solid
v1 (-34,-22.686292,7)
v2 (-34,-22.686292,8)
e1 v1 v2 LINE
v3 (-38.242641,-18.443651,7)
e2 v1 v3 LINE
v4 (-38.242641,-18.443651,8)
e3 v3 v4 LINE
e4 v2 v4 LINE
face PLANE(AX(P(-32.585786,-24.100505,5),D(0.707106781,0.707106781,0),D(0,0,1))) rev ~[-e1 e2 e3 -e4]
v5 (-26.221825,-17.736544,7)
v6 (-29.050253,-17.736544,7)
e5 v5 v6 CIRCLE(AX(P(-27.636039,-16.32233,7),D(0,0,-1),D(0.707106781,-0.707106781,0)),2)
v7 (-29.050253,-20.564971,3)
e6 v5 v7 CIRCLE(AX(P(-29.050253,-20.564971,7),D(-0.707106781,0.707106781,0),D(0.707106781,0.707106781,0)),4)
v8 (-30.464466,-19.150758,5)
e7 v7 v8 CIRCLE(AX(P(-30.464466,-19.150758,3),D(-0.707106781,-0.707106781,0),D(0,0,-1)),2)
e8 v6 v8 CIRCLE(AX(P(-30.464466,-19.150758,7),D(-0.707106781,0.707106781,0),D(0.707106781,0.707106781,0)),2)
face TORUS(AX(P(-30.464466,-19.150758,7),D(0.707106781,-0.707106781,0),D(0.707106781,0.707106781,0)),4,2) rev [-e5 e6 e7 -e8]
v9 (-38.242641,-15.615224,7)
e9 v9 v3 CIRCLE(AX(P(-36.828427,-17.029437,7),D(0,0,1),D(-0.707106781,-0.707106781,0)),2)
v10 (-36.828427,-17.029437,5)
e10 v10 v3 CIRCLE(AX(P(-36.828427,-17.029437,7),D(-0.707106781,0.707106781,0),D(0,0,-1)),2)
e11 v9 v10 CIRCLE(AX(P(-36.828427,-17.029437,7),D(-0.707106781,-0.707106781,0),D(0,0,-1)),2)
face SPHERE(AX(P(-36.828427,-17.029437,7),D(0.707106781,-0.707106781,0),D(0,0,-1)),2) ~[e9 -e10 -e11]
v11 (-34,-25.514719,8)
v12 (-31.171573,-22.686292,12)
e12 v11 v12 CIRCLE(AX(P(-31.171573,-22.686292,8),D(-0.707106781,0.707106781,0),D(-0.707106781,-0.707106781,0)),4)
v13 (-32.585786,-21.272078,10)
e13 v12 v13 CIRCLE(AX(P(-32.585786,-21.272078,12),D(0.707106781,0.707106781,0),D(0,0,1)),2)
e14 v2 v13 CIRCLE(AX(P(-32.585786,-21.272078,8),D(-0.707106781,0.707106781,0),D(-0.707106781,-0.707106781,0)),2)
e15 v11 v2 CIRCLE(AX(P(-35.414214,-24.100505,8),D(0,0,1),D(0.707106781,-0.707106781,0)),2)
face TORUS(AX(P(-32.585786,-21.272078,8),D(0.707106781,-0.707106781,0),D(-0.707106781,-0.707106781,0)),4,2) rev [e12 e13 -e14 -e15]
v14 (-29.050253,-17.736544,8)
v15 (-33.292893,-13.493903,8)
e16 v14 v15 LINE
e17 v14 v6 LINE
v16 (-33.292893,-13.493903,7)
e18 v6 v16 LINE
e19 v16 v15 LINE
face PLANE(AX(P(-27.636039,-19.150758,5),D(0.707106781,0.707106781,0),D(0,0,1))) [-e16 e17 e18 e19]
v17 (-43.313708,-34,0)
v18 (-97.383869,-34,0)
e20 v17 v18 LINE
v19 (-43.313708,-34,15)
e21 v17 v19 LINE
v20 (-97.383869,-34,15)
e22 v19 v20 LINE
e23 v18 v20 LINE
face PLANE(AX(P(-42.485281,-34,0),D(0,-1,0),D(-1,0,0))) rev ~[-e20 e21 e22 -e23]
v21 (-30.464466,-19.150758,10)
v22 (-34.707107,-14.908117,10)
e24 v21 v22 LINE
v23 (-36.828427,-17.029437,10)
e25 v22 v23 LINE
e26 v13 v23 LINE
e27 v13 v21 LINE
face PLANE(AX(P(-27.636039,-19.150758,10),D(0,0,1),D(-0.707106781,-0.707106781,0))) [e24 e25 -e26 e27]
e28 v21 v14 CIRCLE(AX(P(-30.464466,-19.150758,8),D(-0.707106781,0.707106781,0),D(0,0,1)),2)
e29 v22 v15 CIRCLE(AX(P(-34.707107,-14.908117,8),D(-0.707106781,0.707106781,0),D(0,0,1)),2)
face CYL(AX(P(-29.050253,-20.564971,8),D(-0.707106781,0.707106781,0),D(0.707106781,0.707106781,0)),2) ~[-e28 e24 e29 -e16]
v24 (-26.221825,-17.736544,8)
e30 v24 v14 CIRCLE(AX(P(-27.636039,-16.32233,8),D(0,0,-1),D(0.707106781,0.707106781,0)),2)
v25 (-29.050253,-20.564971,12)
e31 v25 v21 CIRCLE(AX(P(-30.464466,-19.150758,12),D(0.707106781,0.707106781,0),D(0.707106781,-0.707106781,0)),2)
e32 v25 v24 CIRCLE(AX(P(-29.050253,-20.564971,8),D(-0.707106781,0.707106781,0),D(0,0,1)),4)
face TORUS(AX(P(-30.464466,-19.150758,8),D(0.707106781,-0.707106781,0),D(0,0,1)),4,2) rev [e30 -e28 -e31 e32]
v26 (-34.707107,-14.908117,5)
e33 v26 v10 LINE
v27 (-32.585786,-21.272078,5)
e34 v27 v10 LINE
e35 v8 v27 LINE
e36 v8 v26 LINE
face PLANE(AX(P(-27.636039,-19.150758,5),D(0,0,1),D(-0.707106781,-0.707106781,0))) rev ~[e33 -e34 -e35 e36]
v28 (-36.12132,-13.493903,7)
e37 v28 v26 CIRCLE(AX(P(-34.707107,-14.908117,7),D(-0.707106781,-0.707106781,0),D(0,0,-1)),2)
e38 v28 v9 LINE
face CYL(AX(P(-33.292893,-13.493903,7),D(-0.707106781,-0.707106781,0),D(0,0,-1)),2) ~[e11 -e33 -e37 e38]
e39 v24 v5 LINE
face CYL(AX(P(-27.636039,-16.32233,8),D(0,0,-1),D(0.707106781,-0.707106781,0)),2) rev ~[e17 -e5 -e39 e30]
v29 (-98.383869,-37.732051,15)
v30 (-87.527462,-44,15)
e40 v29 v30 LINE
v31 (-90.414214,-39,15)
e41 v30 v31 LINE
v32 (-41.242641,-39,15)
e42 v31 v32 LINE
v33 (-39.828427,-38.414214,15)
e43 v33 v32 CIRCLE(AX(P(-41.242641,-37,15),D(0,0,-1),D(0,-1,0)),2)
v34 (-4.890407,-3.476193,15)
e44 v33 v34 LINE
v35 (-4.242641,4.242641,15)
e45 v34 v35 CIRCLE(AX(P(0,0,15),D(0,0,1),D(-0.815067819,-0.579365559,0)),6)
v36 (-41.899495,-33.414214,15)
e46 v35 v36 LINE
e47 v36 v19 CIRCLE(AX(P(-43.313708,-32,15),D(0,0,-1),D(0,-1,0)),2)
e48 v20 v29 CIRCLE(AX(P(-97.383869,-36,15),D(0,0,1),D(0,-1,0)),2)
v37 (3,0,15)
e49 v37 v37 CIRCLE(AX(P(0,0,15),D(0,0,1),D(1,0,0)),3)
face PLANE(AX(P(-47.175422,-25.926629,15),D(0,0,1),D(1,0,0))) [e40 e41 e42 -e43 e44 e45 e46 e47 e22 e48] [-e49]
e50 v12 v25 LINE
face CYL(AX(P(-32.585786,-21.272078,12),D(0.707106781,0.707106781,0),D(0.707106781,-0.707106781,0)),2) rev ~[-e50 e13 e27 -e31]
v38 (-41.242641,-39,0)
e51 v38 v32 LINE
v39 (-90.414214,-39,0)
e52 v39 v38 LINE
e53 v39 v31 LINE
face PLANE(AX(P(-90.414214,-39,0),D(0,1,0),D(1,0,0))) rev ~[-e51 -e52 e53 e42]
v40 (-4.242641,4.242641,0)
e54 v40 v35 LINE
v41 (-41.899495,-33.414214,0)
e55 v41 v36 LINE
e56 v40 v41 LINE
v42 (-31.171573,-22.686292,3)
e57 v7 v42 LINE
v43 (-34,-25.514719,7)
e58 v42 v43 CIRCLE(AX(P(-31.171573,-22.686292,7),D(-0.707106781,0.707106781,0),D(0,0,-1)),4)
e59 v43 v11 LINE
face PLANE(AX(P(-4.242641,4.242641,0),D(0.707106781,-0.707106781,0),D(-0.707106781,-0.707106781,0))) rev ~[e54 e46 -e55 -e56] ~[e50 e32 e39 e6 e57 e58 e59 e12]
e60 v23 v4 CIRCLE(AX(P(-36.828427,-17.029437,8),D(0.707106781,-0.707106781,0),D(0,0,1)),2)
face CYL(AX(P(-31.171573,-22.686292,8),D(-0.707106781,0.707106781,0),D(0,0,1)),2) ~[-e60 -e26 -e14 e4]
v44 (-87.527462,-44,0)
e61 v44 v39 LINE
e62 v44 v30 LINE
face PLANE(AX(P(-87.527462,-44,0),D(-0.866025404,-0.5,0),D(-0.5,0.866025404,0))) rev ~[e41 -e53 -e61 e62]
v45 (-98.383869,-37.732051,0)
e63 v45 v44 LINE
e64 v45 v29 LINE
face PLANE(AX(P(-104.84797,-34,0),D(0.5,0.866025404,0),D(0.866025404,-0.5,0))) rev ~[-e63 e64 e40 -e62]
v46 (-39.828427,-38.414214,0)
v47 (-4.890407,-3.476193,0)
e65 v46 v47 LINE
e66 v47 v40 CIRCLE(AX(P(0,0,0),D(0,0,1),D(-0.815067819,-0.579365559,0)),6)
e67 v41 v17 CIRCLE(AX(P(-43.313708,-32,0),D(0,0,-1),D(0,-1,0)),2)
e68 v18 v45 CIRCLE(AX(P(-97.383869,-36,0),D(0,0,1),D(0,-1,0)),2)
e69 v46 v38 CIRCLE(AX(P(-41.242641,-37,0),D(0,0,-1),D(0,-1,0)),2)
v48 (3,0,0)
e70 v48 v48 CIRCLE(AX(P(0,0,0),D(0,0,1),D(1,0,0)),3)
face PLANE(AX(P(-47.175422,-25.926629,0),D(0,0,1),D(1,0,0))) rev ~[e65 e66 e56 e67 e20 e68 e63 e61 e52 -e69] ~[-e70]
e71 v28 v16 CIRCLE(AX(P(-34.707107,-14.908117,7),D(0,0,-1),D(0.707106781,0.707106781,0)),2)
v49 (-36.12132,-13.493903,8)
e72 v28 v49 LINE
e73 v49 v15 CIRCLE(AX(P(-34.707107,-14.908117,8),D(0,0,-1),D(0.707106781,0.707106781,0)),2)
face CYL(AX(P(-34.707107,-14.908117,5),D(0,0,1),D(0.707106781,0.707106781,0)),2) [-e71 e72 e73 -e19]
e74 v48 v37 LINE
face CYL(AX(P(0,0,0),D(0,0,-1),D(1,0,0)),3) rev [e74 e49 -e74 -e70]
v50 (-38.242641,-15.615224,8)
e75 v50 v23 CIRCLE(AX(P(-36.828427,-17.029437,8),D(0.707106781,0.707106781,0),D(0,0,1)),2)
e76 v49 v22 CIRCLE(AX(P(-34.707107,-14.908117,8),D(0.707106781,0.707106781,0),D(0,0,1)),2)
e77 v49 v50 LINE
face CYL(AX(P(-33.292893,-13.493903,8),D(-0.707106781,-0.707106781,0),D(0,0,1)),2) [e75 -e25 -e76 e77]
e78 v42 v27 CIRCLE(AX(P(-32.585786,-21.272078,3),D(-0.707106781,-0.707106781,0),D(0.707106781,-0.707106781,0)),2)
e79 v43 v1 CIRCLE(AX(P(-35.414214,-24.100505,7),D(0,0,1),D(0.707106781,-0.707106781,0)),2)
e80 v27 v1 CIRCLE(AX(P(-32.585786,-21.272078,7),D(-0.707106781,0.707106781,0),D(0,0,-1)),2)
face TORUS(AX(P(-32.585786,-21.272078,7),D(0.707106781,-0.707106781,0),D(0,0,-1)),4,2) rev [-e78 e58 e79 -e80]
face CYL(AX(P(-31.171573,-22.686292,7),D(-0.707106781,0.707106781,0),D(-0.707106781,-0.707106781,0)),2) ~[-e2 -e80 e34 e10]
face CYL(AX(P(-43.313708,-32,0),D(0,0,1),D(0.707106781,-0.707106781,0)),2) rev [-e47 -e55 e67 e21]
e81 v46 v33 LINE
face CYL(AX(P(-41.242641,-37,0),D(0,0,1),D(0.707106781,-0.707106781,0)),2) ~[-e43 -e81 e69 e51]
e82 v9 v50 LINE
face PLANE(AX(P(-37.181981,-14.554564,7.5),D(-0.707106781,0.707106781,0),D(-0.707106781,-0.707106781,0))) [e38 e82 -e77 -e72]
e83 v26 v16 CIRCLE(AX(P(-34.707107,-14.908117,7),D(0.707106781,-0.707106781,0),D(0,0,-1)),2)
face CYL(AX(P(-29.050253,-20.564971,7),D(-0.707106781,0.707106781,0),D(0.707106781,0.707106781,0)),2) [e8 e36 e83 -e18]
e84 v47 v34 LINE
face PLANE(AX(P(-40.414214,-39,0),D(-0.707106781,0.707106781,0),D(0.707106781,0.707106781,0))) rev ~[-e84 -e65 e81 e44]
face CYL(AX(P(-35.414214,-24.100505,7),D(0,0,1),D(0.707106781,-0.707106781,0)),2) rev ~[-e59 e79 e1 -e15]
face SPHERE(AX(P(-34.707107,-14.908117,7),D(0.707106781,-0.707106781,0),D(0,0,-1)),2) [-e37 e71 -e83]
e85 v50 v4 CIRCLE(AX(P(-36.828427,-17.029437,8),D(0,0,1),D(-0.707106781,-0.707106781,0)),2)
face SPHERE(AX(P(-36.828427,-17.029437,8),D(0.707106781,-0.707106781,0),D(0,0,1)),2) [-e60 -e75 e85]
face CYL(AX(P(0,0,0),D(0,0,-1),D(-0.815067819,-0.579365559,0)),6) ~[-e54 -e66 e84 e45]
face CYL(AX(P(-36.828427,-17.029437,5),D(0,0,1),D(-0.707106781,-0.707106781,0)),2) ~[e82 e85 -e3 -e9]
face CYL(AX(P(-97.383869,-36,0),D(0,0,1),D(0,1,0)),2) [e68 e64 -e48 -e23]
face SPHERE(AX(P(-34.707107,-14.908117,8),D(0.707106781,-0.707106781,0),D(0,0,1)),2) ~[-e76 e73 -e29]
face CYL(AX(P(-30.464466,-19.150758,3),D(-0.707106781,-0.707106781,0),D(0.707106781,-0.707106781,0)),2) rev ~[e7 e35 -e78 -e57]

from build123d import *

# Parameters (mm, degrees)
F0_R     = 3
F1_DEPTH = 15
F2_W     = 7
F2_H     = 5
F3_DEPTH = 10
F4_F1_R  = 2
F4_F2_R  = 2
F5_R     = 2


with BuildPart() as f1:
    # F0 (on Top) → F1 (new body)
    with BuildSketch(Plane.XY):
        with BuildLine():
            Line((-40.4142135624, -39), (-4.8904069139, -3.4761933515))
            ThreePointArc((-4.8904069139, -3.4761933515), (5.9789831367, -0.5017575617), (-4.2426406871, 4.2426406871))
            Line((-4.2426406871, 4.2426406871), (-42.4852813742, -34))
            Line((-42.4852813742, -34), (-104.8479702921, -34))
            Line((-104.8479702921, -34), (-87.5274622164, -44))
            Line((-87.5274622164, -44), (-90.4142135624, -39))
            Line((-90.4142135624, -39), (-40.4142135624, -39))
        make_face()
        Circle(F0_R, mode=Mode.SUBTRACT)
    extrude(amount=F1_DEPTH)

    # F2 (on face) → F3 (join)
    with BuildSketch(Plane(origin=(-4.2426406871, 4.2426406871, 0), x_dir=(-0.7071067812, -0.7071067812, 0), z_dir=(-0.7071067812, 0.7071067812, 0))):
        with Locations((36.5832611207, 7.5)):
            Rectangle(F2_W, F2_H)
    extrude(amount=F3_DEPTH)

    # F4: fillet of radius 2 on 9 edges, made by hand

    # F4_f1
    f4_f1_edges = [f1.edges().sort_by_distance(p)[0] for p in [
        (-36.1213203436, -20.5649711575, 10),
        (-36.1213203436, -20.5649711575, 5),
        (-31.1715728753, -15.6152236891, 5),
        (-31.1715728753, -15.6152236891, 10),
        (-37.1819805153, -14.5545635174, 10),
        (-37.1819805153, -14.5545635174, 5),
        (-34.7071067812, -12.0796897832, 7.5),
        (-39.6568542495, -17.0294372515, 7.5),
    ]]
    fillet(f4_f1_edges, radius=F4_F1_R)

    # F4_f2
    f4_f2_edges = [f1.edges().sort_by_distance(p)[0] for p in [
        (-32.5857864376, -24.1005050634, 7.5),
        (-32.1715728753, -23.686291501, 5.5857864376),
        (-32.1715728753, -23.686291501, 9.4142135624),
    ]]
    fillet(f4_f2_edges, radius=F4_F2_R)

    # F5
    f5_edges = [f1.edges().sort_by_distance(p)[0] for p in [
        (-104.84797, -34, 7.5),
        (-40.414214, -39, 7.5),
        (-42.485281, -34, 7.5),
    ]]
    fillet(f5_edges, radius=F5_R)


solid = f1.part
